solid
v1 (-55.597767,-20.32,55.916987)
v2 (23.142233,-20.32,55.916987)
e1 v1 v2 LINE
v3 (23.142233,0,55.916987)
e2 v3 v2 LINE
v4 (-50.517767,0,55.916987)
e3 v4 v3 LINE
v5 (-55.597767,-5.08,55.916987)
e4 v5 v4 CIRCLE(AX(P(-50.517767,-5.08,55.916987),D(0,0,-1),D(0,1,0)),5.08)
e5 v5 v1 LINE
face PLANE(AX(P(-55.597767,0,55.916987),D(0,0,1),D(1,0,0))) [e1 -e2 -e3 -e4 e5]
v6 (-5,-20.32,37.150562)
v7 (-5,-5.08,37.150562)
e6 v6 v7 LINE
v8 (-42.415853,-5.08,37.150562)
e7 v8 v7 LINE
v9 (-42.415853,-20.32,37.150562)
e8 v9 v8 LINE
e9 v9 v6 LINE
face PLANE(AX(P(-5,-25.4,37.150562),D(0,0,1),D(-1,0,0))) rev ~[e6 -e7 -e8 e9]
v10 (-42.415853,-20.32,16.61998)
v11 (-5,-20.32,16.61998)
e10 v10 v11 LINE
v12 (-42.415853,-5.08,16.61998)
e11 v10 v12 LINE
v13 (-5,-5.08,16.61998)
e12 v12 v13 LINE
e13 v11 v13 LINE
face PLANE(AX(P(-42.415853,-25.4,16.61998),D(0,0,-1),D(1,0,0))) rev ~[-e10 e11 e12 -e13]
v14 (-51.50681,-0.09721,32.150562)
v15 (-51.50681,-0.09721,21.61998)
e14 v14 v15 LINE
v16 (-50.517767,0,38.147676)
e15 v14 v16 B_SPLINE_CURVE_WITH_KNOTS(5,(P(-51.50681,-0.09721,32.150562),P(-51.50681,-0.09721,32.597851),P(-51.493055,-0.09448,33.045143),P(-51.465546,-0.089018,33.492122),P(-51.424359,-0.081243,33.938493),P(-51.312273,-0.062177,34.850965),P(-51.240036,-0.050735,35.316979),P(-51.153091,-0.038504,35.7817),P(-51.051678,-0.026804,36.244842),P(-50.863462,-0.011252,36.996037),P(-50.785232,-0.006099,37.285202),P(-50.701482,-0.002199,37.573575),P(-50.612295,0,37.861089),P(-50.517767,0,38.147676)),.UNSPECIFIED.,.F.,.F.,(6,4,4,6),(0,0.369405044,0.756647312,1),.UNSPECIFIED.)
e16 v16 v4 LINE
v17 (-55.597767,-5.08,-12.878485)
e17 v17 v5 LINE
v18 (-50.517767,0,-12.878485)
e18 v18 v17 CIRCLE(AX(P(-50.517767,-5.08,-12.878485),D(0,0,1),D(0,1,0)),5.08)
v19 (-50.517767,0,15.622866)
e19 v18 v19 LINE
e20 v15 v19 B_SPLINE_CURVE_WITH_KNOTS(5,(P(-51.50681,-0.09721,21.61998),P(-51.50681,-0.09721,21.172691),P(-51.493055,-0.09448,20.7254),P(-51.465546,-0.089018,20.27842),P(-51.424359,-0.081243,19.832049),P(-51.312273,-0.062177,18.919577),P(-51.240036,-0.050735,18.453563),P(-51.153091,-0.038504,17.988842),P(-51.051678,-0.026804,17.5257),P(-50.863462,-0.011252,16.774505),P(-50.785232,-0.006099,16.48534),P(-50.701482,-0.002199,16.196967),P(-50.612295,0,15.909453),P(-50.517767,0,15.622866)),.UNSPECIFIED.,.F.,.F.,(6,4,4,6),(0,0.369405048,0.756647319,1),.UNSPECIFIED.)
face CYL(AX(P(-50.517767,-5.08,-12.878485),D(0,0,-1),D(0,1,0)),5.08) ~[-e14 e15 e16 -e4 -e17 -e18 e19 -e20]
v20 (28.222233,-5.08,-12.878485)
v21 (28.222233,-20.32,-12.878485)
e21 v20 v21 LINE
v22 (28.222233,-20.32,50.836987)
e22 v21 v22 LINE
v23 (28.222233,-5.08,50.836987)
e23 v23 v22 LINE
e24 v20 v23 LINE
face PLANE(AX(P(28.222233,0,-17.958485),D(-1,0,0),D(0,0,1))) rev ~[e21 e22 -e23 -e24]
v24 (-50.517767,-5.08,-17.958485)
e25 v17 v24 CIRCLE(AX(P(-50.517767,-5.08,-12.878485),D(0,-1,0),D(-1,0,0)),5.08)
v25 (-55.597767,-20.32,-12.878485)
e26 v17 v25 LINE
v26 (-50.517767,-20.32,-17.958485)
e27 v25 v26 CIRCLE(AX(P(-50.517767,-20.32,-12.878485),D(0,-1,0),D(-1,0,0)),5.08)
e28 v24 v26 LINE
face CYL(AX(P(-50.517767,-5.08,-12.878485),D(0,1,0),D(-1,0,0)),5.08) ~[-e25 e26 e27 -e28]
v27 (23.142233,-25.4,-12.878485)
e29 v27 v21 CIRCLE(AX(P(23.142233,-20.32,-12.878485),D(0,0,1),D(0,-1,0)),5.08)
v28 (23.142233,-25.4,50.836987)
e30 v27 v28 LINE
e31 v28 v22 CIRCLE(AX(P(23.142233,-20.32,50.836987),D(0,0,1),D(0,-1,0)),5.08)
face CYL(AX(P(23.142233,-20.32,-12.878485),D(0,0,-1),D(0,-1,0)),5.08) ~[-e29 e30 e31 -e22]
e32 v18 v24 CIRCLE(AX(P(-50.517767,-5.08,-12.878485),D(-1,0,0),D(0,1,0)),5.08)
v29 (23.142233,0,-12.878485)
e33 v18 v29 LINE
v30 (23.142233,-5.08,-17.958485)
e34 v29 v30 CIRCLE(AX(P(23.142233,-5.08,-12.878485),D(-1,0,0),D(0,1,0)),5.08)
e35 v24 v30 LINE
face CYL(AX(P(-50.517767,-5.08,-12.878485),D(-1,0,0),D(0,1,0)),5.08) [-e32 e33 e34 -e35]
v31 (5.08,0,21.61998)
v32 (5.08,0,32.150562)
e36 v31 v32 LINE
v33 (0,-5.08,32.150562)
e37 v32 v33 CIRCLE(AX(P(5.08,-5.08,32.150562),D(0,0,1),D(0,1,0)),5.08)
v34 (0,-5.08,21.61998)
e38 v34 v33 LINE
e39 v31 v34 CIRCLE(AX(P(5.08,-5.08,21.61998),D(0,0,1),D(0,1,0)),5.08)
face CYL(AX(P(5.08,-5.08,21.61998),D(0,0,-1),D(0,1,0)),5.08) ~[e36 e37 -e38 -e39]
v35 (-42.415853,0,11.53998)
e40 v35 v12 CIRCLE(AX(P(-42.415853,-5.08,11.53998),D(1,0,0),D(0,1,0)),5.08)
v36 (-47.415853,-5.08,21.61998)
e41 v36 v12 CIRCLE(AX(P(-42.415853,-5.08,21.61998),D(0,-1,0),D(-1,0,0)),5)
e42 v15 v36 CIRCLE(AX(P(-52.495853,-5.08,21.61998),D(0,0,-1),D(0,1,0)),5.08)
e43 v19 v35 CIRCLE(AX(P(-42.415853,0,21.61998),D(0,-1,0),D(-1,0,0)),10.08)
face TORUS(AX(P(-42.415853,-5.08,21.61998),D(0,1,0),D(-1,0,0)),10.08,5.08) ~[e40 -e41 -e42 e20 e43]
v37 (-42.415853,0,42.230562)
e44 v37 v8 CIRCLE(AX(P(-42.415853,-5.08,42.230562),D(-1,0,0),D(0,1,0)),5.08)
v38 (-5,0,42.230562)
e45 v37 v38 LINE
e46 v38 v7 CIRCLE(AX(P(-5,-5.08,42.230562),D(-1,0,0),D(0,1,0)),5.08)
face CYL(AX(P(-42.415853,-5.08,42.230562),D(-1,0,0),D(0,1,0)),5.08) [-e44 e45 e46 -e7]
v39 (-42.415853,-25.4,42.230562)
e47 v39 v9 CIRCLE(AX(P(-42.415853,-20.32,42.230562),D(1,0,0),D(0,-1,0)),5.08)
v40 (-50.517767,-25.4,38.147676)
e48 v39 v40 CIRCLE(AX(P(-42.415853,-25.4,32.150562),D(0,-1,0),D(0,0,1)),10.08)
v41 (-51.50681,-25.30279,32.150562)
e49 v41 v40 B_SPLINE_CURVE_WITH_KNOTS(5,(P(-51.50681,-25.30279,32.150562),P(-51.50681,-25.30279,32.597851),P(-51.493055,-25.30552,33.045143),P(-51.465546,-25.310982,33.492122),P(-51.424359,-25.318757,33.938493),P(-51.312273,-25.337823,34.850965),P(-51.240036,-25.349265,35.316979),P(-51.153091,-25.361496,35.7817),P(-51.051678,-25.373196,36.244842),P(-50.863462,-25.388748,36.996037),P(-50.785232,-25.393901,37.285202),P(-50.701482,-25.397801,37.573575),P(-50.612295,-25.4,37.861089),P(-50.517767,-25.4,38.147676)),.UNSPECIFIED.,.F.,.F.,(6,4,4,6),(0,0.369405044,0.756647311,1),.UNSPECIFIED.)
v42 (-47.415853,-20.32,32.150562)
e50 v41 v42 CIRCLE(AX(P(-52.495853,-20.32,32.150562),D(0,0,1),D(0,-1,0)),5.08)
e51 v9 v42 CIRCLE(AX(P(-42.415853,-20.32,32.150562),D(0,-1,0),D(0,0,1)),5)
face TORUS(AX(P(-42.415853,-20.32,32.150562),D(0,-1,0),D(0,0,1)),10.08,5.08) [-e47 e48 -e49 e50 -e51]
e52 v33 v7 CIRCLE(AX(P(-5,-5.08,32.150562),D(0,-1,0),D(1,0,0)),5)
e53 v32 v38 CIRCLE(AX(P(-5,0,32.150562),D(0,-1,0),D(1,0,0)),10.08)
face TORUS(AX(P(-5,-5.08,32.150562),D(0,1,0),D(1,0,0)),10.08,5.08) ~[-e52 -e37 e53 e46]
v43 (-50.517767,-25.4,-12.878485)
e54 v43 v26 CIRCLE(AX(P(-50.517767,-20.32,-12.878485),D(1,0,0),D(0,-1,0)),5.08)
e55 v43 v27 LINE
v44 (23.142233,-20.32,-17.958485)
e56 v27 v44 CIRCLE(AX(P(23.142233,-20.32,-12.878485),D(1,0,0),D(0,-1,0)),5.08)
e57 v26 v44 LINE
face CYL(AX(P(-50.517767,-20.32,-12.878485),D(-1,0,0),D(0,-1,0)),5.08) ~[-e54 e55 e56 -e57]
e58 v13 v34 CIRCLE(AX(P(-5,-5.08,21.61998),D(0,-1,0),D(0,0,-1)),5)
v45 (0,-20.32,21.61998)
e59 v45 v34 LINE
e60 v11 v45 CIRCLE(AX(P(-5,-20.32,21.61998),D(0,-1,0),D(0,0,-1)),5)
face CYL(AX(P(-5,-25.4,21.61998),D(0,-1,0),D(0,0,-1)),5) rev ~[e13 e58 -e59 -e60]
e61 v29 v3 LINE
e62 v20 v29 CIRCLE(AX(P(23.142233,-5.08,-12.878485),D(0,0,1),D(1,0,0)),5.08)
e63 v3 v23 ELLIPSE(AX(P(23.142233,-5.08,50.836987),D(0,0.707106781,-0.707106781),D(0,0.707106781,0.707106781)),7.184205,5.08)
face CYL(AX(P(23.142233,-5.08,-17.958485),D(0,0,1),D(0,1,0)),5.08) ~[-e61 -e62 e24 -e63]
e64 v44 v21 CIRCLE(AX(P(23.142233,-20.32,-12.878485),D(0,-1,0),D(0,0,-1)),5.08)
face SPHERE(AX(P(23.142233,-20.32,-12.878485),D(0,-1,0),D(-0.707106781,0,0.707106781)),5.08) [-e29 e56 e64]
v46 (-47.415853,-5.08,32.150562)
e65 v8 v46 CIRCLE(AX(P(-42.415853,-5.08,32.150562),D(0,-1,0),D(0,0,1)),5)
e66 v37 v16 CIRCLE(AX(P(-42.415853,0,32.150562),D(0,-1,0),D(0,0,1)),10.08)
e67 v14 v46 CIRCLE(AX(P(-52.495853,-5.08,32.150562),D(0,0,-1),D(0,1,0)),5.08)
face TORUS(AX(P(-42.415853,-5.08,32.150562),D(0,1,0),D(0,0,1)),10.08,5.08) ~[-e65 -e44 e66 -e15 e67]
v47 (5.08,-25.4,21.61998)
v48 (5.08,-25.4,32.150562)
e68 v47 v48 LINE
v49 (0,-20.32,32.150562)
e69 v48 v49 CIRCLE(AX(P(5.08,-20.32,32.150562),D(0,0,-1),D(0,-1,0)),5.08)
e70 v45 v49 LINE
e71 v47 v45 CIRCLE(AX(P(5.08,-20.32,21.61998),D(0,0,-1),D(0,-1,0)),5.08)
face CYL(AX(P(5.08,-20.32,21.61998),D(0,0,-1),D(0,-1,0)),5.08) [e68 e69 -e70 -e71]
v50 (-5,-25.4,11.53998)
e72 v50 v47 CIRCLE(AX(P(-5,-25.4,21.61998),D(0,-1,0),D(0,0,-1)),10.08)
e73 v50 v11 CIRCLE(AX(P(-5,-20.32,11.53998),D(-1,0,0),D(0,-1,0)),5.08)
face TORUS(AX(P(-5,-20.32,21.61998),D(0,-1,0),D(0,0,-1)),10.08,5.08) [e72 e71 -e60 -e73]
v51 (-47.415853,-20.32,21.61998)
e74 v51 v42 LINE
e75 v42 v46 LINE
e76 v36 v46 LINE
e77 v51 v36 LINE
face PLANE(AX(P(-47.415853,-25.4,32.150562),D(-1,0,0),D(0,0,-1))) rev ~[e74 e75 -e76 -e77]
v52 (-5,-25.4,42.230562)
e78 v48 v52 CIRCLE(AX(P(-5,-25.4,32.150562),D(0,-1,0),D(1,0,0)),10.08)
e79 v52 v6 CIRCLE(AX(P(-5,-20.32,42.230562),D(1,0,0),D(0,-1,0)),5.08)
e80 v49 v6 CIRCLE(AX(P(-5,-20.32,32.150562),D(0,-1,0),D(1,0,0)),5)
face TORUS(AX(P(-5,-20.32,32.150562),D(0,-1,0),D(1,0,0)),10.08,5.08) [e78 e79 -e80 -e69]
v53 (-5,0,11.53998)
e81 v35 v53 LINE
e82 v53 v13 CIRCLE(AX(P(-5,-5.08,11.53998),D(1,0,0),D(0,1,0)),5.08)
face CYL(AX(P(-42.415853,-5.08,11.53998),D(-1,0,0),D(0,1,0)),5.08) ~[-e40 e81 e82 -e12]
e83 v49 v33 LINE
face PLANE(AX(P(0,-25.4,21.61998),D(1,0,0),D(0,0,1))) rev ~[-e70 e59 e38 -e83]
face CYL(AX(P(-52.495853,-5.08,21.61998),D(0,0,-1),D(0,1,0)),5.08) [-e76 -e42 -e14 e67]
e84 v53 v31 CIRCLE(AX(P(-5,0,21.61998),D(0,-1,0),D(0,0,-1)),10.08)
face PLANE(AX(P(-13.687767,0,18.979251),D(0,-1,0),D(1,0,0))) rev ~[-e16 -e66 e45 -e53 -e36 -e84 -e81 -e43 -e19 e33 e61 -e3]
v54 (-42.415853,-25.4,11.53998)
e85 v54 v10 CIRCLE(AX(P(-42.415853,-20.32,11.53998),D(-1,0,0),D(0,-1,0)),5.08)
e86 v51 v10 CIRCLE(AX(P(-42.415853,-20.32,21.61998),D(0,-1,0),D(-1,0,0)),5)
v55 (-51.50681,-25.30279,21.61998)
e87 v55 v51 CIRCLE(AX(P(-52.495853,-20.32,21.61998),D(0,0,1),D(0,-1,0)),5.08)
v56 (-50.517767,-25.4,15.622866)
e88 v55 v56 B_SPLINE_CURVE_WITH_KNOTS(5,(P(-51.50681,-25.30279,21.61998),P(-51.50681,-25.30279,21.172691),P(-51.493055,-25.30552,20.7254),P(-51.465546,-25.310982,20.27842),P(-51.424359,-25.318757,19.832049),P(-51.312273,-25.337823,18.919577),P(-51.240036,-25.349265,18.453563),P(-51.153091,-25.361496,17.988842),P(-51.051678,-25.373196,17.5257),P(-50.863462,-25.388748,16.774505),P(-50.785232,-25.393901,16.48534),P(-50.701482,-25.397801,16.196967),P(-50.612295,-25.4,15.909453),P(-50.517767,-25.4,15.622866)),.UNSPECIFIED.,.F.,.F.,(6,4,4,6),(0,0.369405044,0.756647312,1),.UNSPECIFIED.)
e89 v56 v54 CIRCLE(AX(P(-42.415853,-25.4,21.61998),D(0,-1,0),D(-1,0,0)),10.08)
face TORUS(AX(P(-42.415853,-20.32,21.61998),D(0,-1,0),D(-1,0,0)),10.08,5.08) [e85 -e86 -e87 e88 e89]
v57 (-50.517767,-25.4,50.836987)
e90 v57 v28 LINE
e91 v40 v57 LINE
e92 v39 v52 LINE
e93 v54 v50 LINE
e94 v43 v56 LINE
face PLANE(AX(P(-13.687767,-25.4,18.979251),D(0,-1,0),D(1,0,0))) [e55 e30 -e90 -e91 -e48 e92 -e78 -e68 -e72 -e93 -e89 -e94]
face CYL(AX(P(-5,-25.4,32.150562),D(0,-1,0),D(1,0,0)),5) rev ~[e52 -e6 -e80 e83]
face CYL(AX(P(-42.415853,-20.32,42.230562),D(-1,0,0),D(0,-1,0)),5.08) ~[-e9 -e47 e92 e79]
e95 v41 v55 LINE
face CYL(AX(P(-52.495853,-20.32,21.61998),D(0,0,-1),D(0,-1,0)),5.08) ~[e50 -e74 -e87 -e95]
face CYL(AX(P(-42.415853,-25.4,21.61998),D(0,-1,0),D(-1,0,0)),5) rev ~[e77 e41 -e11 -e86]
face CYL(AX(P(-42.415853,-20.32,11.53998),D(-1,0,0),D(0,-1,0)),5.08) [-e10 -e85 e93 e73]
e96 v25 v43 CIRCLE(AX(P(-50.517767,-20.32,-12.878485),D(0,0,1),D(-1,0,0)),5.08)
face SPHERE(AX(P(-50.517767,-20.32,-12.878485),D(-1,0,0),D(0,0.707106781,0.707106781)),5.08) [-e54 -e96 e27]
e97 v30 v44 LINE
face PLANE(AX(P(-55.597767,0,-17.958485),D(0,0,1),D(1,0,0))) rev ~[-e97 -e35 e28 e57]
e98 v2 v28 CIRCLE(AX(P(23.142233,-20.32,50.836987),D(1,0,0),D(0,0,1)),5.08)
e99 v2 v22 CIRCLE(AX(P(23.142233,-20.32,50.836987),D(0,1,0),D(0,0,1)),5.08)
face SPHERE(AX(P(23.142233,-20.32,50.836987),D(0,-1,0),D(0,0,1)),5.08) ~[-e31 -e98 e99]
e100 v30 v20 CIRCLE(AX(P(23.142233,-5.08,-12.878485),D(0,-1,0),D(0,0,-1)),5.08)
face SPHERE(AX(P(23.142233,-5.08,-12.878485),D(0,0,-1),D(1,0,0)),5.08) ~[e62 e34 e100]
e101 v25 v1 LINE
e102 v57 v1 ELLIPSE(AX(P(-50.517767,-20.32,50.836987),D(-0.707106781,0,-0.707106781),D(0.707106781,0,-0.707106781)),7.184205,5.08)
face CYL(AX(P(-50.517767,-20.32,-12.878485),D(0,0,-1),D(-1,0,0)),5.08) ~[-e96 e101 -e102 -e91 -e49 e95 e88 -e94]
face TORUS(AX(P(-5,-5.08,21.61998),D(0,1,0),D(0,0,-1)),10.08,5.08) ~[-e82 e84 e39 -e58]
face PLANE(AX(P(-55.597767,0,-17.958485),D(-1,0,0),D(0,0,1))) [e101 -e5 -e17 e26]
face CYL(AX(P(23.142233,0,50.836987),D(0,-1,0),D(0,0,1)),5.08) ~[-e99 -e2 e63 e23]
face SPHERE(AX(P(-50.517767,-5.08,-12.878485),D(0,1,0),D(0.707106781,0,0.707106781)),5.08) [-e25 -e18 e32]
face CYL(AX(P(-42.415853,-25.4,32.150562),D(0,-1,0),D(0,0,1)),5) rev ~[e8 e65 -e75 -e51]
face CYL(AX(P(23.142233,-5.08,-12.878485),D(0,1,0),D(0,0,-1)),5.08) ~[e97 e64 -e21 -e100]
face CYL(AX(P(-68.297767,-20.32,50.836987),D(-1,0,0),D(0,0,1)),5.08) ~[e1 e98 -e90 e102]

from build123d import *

# Parameters (mm, degrees)
F0_W         = 83.8200002909
F0_H         = 73.8754719496
F1_DEPTH     = 25.4
F3_DEPTH     = 25.4
F4_R         = 5.08
F5_T1_DEPTH  = 63.7154719496
F5_T3_DEPTH  = 73.6600002909
F5_T5_DEPTH  = 81.4954719496
F5_T7_DEPTH  = 37.4158525467
F5_T9_DEPTH  = 15.24
F5_T11_DEPTH = 10.5305814743
F5_T13_DEPTH = 91.4400002909
F5_S17_W     = 5.08
F5_S17_H     = 5.08
F5_T18_DEPTH = 5.08
F5_S23_W     = 5.08
F5_S23_H     = 5.08
F5_T24_DEPTH = 5.08
F5_S29_W     = 5.08
F5_S29_H     = 5.08
F5_T30_DEPTH = 5.08
F5_T34_ANGLE = 90
F5_T36_ANGLE = 90
F5_T38_ANGLE = 90
F5_T40_ANGLE = 90
F5_T42_ANGLE = 90
F5_T44_ANGLE = 90
F5_T46_ANGLE = 90
F5_T48_ANGLE = 90
F5_T50_ANGLE = 90
F5_T52_ANGLE = 90


# Not quite as in the source:
# - a fillet or chamfer that OpenCascade refuses, or shapes differently, is made with other operations: its cross-section is extruded or revolved along the edge and cut away or added
# - a feature names something its author has since deleted; it is built from what else it names


with BuildPart() as f1:
    # F0 (on Front) → F1 (new body)
    with BuildSketch(Plane.XZ):
        with Locations((-13.6877670884, 18.9792513847)):
            Rectangle(F0_W, F0_H)
    extrude(amount=F1_DEPTH)

    # F2 (on face) → F3 (cut)
    with BuildSketch(Plane.XZ.offset(25.4)):
        with BuildLine():
            ThreePointArc((0, 32.1505618095), (-1.4644660941, 35.6860957155), (-5, 37.1505618095))
            Line((-5, 37.1505618095), (-42.4158525467, 37.1505618095))
            ThreePointArc((-42.4158525467, 37.1505618095), (-45.9513864526, 35.6860957155), (-47.4158525467, 32.1505618095))
            Line((-47.4158525467, 32.1505618095), (-47.4158525467, 21.6199803352))
            ThreePointArc((-47.4158525467, 21.6199803352), (-45.9513864526, 18.0844464293), (-42.4158525467, 16.6199803352))
            Line((-42.4158525467, 16.6199803352), (-5, 16.6199803352))
            ThreePointArc((-5, 16.6199803352), (-1.4644660941, 18.0844464293), (0, 21.6199803352))
            Line((0, 21.6199803352), (0, 32.1505618095))
        make_face()
    extrude(amount=-F3_DEPTH, mode=Mode.SUBTRACT)

    # F4
    f4_edges = [f1.edges().sort_by_distance(p)[0] for p in [
        (28.222233, 0, 18.979251),
        (28.222233, -12.7, 55.916987),
    ]]
    fillet(f4_edges, radius=F4_R)

    # F5: fillet of radius 5.08 on 10 edges, made by hand

    # F5_s2 → F5_t1 (cut)
    with BuildSketch(Plane.XY.offset(-12.8784845901)):
        with BuildLine():
            ThreePointArc((23.142233057, -25.4), (26.7343355054, -23.9121024484), (28.222233057, -20.32))
            Line((28.222233057, -20.32), (28.222233057, -25.4))
            Line((28.222233057, -25.4), (23.142233057, -25.4))
        make_face()
    extrude(amount=F5_T1_DEPTH, mode=Mode.SUBTRACT)

    # F5_s4 → F5_t3 (cut)
    with BuildSketch(Plane.YZ.offset(-50.5177672338)):
        with BuildLine():
            ThreePointArc((-25.4, -12.8784845901), (-23.9121024484, -16.4705870385), (-20.32, -17.9584845901))
            Line((-20.32, -17.9584845901), (-25.4, -17.9584845901))
            Line((-25.4, -17.9584845901), (-25.4, -12.8784845901))
        make_face()
        with BuildLine():
            ThreePointArc((0, -12.8784845901), (-1.4878975516, -16.4705870385), (-5.08, -17.9584845901))
            Line((-5.08, -17.9584845901), (0, -17.9584845901))
            Line((0, -17.9584845901), (0, -12.8784845901))
        make_face()
    extrude(amount=F5_T3_DEPTH, mode=Mode.SUBTRACT)

    # F5_s6 → F5_t5 (cut)
    with BuildSketch(Plane.XY.offset(-12.8784845901)):
        with BuildLine():
            ThreePointArc((-55.5977672338, -20.32), (-54.1098696823, -23.9121024484), (-50.5177672338, -25.4))
            Line((-50.5177672338, -25.4), (-55.5977672338, -25.4))
            Line((-55.5977672338, -25.4), (-55.5977672338, -20.32))
        make_face()
        with BuildLine():
            ThreePointArc((-50.5177672338, 0), (-54.1098696823, -1.4878975516), (-55.5977672338, -5.08))
            Line((-55.5977672338, -5.08), (-55.5977672338, 0))
            Line((-55.5977672338, 0), (-50.5177672338, 0))
        make_face()
    extrude(amount=F5_T5_DEPTH, mode=Mode.SUBTRACT)

    # F5_s8 → F5_t7 (cut)
    with BuildSketch(Plane.YZ.offset(-42.4158525467)):
        with BuildLine():
            ThreePointArc((-25.4, 42.2305618095), (-23.9121024484, 38.6384593611), (-20.32, 37.1505618095))
            Line((-20.32, 37.1505618095), (-25.4, 37.1505618095))
            Line((-25.4, 37.1505618095), (-25.4, 42.2305618095))
        make_face()
        with BuildLine():
            ThreePointArc((0, 11.5399803352), (-1.4878975516, 15.1320827837), (-5.08, 16.6199803352))
            Line((-5.08, 16.6199803352), (0, 16.6199803352))
            Line((0, 16.6199803352), (0, 11.5399803352))
        make_face()
        with BuildLine():
            ThreePointArc((0, 42.2305618095), (-1.4878975516, 38.6384593611), (-5.08, 37.1505618095))
            Line((-5.08, 37.1505618095), (0, 37.1505618095))
            Line((0, 37.1505618095), (0, 42.2305618095))
        make_face()
        with BuildLine():
            ThreePointArc((-25.4, 11.5399803352), (-23.9121024484, 15.1320827837), (-20.32, 16.6199803352))
            Line((-20.32, 16.6199803352), (-25.4, 16.6199803352))
            Line((-25.4, 16.6199803352), (-25.4, 11.5399803352))
        make_face()
    extrude(amount=F5_T7_DEPTH, mode=Mode.SUBTRACT)

    # F5_s10 → F5_t9 (cut)
    with BuildSketch(Plane.XZ.offset(5.08)):
        with BuildLine():
            ThreePointArc((-55.5977672338, -12.8784845901), (-54.1098696823, -16.4705870385), (-50.5177672338, -17.9584845901))
            Line((-50.5177672338, -17.9584845901), (-55.5977672338, -17.9584845901))
            Line((-55.5977672338, -17.9584845901), (-55.5977672338, -12.8784845901))
        make_face()
        with BuildLine():
            ThreePointArc((23.142233057, -17.9584845901), (26.7343355054, -16.4705870385), (28.222233057, -12.8784845901))
            Line((28.222233057, -12.8784845901), (28.222233057, -17.9584845901))
            Line((28.222233057, -17.9584845901), (23.142233057, -17.9584845901))
        make_face()
    extrude(amount=F5_T9_DEPTH, mode=Mode.SUBTRACT)

    # F5_s12 → F5_t11 (cut)
    with BuildSketch(Plane.XY.offset(21.6199803352)):
        with BuildLine():
            ThreePointArc((-52.4958525467, 0), (-48.9037500983, -1.4878975516), (-47.4158525467, -5.08))
            Line((-47.4158525467, -5.08), (-47.4158525467, 0))
            Line((-47.4158525467, 0), (-52.4958525467, 0))
        make_face()
        with BuildLine():
            ThreePointArc((5.08, 0), (1.4878975516, -1.4878975516), (0, -5.08))
            Line((0, -5.08), (0, 0))
            Line((0, 0), (5.08, 0))
        make_face()
        with BuildLine():
            ThreePointArc((5.08, -25.4), (1.4878975516, -23.9121024484), (0, -20.32))
            Line((0, -20.32), (0, -25.4))
            Line((0, -25.4), (5.08, -25.4))
        make_face()
        with BuildLine():
            ThreePointArc((-52.4958525467, -25.4), (-48.9037500983, -23.9121024484), (-47.4158525467, -20.32))
            Line((-47.4158525467, -20.32), (-47.4158525467, -25.4))
            Line((-47.4158525467, -25.4), (-52.4958525467, -25.4))
        make_face()
    extrude(amount=F5_T11_DEPTH, mode=Mode.SUBTRACT)

    # F5_s14 → F5_t13 (cut)
    with BuildSketch(Plane.YZ.offset(-68.2977672338)):
        with BuildLine():
            ThreePointArc((-20.32, 55.9169873595), (-23.9121024484, 54.429089808), (-25.4, 50.8369873595))
            Line((-25.4, 50.8369873595), (-25.4, 55.9169873595))
            Line((-25.4, 55.9169873595), (-20.32, 55.9169873595))
        make_face()
    extrude(amount=F5_T13_DEPTH, mode=Mode.SUBTRACT)


with BuildPart() as f5_tool16:
    # F5_s17 → F5_t18 (new body)
    with BuildSketch(Plane.XZ.offset(20.32)):
        with Locations((25.682233057, -15.4184845901)):
            Rectangle(F5_S17_W, F5_S17_H)
    extrude(amount=F5_T18_DEPTH)

    # F5_s19 → F5_t20 (revolve, cut)
    with BuildSketch(Plane(origin=(23.142233057, -20.32, -12.8784845901), x_dir=(-0.7071067812, 0, 0.7071067812), z_dir=(0.7071067812, 0, 0.7071067812))):
        with BuildLine():
            ThreePointArc((0, -5.08), (5.08, 0), (0, 5.08))
            Line((0, 5.08), (0, -5.08))
        make_face()
    revolve(axis=Axis((23.142233057, -20.32, -12.8784845901), (0, -1, 0)), mode=Mode.SUBTRACT)


with BuildPart() as f1_1:
    add(f1.part)

    # F5_t15: cut F5_tool16
    add(f5_tool16.part, mode=Mode.SUBTRACT)


with BuildPart() as f5_tool22:
    # F5_s23 → F5_t24 (new body)
    with BuildSketch(Plane.YZ.offset(-50.5177672338)):
        with Locations((-22.86, -15.4184845901)):
            Rectangle(F5_S23_W, F5_S23_H)
    extrude(amount=-F5_T24_DEPTH)

    # F5_s25 → F5_t26 (revolve, cut)
    with BuildSketch(Plane(origin=(-50.5177672338, -20.32, -12.8784845901), x_dir=(0, 0.7071067812, 0.7071067812), z_dir=(0, -0.7071067812, 0.7071067812))):
        with BuildLine():
            ThreePointArc((0, -5.08), (5.08, 0), (0, 5.08))
            Line((0, 5.08), (0, -5.08))
        make_face()
    revolve(axis=Axis((-50.5177672338, -20.32, -12.8784845901), (-1, 0, 0)), mode=Mode.SUBTRACT)


with BuildPart() as f1_2:
    add(f1_1.part)

    # F5_t21: cut F5_tool22
    add(f5_tool22.part, mode=Mode.SUBTRACT)


with BuildPart() as f5_tool28:
    # F5_s29 → F5_t30 (new body)
    with BuildSketch(Plane.XZ.offset(5.08)):
        with Locations((-53.0577672338, -15.4184845901)):
            Rectangle(F5_S29_W, F5_S29_H)
    extrude(amount=-F5_T30_DEPTH)

    # F5_s31 → F5_t32 (revolve, cut)
    with BuildSketch(Plane(origin=(-50.5177672338, -5.08, -12.8784845901), x_dir=(0.7071067812, 0, 0.7071067812), z_dir=(-0.7071067812, 0, 0.7071067812))):
        with BuildLine():
            ThreePointArc((0, -5.08), (5.08, 0), (0, 5.08))
            Line((0, 5.08), (0, -5.08))
        make_face()
    revolve(axis=Axis((-50.5177672338, -5.08, -12.8784845901), (0, 1, 0)), mode=Mode.SUBTRACT)


with BuildPart() as f1_3:
    add(f1_2.part)

    # F5_t27: cut F5_tool28
    add(f5_tool28.part, mode=Mode.SUBTRACT)

    # F5_s33 → F5_t34 (revolve, cut)
    with BuildSketch(Plane.XY.offset(32.1505618095)):
        with BuildLine():
            ThreePointArc((5.08, -25.4), (1.4878975516, -23.9121024484), (0, -20.32))
            Line((0, -20.32), (0, -25.4))
            Line((0, -25.4), (5.08, -25.4))
        make_face()
    revolve(axis=Axis((-5, -25.4, 32.1505618095), (0, -1, 0)), revolution_arc=F5_T34_ANGLE, mode=Mode.SUBTRACT)

    # F5_s35 → F5_t36 (revolve, cut)
    with BuildSketch(Plane.XY.offset(21.6199803352)):
        with BuildLine():
            ThreePointArc((-52.4958525467, 0), (-48.9037500983, -1.4878975516), (-47.4158525467, -5.08))
            Line((-47.4158525467, -5.08), (-47.4158525467, 0))
            Line((-47.4158525467, 0), (-52.4958525467, 0))
        make_face()
    revolve(axis=Axis((-42.4158525467, 0, 21.6199803352), (0, -1, 0)), revolution_arc=F5_T36_ANGLE, mode=Mode.SUBTRACT)

    # F5_s37 → F5_t38 (revolve, cut)
    with BuildSketch(Plane.YZ.offset(-42.4158525467)):
        with BuildLine():
            ThreePointArc((0, 42.2305618095), (-1.4878975516, 38.6384593611), (-5.08, 37.1505618095))
            Line((-5.08, 37.1505618095), (0, 37.1505618095))
            Line((0, 37.1505618095), (0, 42.2305618095))
        make_face()
    revolve(axis=Axis((-42.4158525467, 0, 32.1505618095), (0, -1, 0)), revolution_arc=F5_T38_ANGLE, mode=Mode.SUBTRACT)

    # F5_s39 → F5_t40 (revolve, cut)
    with BuildSketch(Plane.XY.offset(32.1505618095)):
        with BuildLine():
            ThreePointArc((5.08, 0), (1.4878975516, -1.4878975516), (0, -5.08))
            Line((0, -5.08), (0, 0))
            Line((0, 0), (5.08, 0))
        make_face()
    revolve(axis=Axis((-5, 0, 32.1505618095), (0, -1, 0)), revolution_arc=F5_T40_ANGLE, mode=Mode.SUBTRACT)

    # F5_s41 → F5_t42 (revolve, cut)
    with BuildSketch(Plane.YZ.offset(-5)):
        with BuildLine():
            ThreePointArc((0, 11.5399803352), (-1.4878975516, 15.1320827837), (-5.08, 16.6199803352))
            Line((-5.08, 16.6199803352), (0, 16.6199803352))
            Line((0, 16.6199803352), (0, 11.5399803352))
        make_face()
    revolve(axis=Axis((-5, 0, 21.6199803352), (0, -1, 0)), revolution_arc=F5_T42_ANGLE, mode=Mode.SUBTRACT)

    # F5_s43 → F5_t44 (revolve, cut)
    with BuildSketch(Plane.XZ.offset(5.08)):
        with BuildLine():
            ThreePointArc((28.222233057, -12.8784845901), (26.7343355054, -16.4705870385), (23.142233057, -17.9584845901))
            Line((23.142233057, -17.9584845901), (28.222233057, -17.9584845901))
            Line((28.222233057, -17.9584845901), (28.222233057, -12.8784845901))
        make_face()
    revolve(axis=Axis((23.142233057, -5.08, -17.9584845901), (0, 0, 1)), revolution_arc=F5_T44_ANGLE, mode=Mode.SUBTRACT)

    # F5_s45 → F5_t46 (revolve, cut)
    with BuildSketch(Plane.YZ.offset(-5)):
        with BuildLine():
            ThreePointArc((-25.4, 11.5399803352), (-23.9121024484, 15.1320827837), (-20.32, 16.6199803352))
            Line((-20.32, 16.6199803352), (-25.4, 16.6199803352))
            Line((-25.4, 16.6199803352), (-25.4, 11.5399803352))
        make_face()
    revolve(axis=Axis((-5, -25.4, 21.6199803352), (0, -1, 0)), revolution_arc=F5_T46_ANGLE, mode=Mode.SUBTRACT)

    # F5_s47 → F5_t48 (revolve, cut)
    with BuildSketch(Plane.XY.offset(21.6199803352)):
        with BuildLine():
            ThreePointArc((-52.4958525467, -25.4), (-48.9037500983, -23.9121024484), (-47.4158525467, -20.32))
            Line((-47.4158525467, -20.32), (-47.4158525467, -25.4))
            Line((-47.4158525467, -25.4), (-52.4958525467, -25.4))
        make_face()
    revolve(axis=Axis((-42.4158525467, -25.4, 21.6199803352), (0, -1, 0)), revolution_arc=F5_T48_ANGLE, mode=Mode.SUBTRACT)

    # F5_s49 → F5_t50 (revolve, cut)
    with BuildSketch(Plane.YZ.offset(-42.4158525467)):
        with BuildLine():
            ThreePointArc((-25.4, 42.2305618095), (-23.9121024484, 38.6384593611), (-20.32, 37.1505618095))
            Line((-20.32, 37.1505618095), (-25.4, 37.1505618095))
            Line((-25.4, 37.1505618095), (-25.4, 42.2305618095))
        make_face()
    revolve(axis=Axis((-42.4158525467, -25.4, 32.1505618095), (0, -1, 0)), revolution_arc=F5_T50_ANGLE, mode=Mode.SUBTRACT)

    # F5_s51 → F5_t52 (revolve, cut)
    with BuildSketch(Plane.YZ.offset(23.142233057)):
        with BuildLine():
            ThreePointArc((-20.32, 55.9169873595), (-23.9121024484, 54.429089808), (-25.4, 50.8369873595))
            Line((-25.4, 50.8369873595), (-25.4, 55.9169873595))
            Line((-25.4, 55.9169873595), (-20.32, 55.9169873595))
        make_face()
    revolve(axis=Axis((23.142233057, -25.4, 50.8369873595), (0, 1, 0)), revolution_arc=F5_T52_ANGLE, mode=Mode.SUBTRACT)


solid = f1_3.part
